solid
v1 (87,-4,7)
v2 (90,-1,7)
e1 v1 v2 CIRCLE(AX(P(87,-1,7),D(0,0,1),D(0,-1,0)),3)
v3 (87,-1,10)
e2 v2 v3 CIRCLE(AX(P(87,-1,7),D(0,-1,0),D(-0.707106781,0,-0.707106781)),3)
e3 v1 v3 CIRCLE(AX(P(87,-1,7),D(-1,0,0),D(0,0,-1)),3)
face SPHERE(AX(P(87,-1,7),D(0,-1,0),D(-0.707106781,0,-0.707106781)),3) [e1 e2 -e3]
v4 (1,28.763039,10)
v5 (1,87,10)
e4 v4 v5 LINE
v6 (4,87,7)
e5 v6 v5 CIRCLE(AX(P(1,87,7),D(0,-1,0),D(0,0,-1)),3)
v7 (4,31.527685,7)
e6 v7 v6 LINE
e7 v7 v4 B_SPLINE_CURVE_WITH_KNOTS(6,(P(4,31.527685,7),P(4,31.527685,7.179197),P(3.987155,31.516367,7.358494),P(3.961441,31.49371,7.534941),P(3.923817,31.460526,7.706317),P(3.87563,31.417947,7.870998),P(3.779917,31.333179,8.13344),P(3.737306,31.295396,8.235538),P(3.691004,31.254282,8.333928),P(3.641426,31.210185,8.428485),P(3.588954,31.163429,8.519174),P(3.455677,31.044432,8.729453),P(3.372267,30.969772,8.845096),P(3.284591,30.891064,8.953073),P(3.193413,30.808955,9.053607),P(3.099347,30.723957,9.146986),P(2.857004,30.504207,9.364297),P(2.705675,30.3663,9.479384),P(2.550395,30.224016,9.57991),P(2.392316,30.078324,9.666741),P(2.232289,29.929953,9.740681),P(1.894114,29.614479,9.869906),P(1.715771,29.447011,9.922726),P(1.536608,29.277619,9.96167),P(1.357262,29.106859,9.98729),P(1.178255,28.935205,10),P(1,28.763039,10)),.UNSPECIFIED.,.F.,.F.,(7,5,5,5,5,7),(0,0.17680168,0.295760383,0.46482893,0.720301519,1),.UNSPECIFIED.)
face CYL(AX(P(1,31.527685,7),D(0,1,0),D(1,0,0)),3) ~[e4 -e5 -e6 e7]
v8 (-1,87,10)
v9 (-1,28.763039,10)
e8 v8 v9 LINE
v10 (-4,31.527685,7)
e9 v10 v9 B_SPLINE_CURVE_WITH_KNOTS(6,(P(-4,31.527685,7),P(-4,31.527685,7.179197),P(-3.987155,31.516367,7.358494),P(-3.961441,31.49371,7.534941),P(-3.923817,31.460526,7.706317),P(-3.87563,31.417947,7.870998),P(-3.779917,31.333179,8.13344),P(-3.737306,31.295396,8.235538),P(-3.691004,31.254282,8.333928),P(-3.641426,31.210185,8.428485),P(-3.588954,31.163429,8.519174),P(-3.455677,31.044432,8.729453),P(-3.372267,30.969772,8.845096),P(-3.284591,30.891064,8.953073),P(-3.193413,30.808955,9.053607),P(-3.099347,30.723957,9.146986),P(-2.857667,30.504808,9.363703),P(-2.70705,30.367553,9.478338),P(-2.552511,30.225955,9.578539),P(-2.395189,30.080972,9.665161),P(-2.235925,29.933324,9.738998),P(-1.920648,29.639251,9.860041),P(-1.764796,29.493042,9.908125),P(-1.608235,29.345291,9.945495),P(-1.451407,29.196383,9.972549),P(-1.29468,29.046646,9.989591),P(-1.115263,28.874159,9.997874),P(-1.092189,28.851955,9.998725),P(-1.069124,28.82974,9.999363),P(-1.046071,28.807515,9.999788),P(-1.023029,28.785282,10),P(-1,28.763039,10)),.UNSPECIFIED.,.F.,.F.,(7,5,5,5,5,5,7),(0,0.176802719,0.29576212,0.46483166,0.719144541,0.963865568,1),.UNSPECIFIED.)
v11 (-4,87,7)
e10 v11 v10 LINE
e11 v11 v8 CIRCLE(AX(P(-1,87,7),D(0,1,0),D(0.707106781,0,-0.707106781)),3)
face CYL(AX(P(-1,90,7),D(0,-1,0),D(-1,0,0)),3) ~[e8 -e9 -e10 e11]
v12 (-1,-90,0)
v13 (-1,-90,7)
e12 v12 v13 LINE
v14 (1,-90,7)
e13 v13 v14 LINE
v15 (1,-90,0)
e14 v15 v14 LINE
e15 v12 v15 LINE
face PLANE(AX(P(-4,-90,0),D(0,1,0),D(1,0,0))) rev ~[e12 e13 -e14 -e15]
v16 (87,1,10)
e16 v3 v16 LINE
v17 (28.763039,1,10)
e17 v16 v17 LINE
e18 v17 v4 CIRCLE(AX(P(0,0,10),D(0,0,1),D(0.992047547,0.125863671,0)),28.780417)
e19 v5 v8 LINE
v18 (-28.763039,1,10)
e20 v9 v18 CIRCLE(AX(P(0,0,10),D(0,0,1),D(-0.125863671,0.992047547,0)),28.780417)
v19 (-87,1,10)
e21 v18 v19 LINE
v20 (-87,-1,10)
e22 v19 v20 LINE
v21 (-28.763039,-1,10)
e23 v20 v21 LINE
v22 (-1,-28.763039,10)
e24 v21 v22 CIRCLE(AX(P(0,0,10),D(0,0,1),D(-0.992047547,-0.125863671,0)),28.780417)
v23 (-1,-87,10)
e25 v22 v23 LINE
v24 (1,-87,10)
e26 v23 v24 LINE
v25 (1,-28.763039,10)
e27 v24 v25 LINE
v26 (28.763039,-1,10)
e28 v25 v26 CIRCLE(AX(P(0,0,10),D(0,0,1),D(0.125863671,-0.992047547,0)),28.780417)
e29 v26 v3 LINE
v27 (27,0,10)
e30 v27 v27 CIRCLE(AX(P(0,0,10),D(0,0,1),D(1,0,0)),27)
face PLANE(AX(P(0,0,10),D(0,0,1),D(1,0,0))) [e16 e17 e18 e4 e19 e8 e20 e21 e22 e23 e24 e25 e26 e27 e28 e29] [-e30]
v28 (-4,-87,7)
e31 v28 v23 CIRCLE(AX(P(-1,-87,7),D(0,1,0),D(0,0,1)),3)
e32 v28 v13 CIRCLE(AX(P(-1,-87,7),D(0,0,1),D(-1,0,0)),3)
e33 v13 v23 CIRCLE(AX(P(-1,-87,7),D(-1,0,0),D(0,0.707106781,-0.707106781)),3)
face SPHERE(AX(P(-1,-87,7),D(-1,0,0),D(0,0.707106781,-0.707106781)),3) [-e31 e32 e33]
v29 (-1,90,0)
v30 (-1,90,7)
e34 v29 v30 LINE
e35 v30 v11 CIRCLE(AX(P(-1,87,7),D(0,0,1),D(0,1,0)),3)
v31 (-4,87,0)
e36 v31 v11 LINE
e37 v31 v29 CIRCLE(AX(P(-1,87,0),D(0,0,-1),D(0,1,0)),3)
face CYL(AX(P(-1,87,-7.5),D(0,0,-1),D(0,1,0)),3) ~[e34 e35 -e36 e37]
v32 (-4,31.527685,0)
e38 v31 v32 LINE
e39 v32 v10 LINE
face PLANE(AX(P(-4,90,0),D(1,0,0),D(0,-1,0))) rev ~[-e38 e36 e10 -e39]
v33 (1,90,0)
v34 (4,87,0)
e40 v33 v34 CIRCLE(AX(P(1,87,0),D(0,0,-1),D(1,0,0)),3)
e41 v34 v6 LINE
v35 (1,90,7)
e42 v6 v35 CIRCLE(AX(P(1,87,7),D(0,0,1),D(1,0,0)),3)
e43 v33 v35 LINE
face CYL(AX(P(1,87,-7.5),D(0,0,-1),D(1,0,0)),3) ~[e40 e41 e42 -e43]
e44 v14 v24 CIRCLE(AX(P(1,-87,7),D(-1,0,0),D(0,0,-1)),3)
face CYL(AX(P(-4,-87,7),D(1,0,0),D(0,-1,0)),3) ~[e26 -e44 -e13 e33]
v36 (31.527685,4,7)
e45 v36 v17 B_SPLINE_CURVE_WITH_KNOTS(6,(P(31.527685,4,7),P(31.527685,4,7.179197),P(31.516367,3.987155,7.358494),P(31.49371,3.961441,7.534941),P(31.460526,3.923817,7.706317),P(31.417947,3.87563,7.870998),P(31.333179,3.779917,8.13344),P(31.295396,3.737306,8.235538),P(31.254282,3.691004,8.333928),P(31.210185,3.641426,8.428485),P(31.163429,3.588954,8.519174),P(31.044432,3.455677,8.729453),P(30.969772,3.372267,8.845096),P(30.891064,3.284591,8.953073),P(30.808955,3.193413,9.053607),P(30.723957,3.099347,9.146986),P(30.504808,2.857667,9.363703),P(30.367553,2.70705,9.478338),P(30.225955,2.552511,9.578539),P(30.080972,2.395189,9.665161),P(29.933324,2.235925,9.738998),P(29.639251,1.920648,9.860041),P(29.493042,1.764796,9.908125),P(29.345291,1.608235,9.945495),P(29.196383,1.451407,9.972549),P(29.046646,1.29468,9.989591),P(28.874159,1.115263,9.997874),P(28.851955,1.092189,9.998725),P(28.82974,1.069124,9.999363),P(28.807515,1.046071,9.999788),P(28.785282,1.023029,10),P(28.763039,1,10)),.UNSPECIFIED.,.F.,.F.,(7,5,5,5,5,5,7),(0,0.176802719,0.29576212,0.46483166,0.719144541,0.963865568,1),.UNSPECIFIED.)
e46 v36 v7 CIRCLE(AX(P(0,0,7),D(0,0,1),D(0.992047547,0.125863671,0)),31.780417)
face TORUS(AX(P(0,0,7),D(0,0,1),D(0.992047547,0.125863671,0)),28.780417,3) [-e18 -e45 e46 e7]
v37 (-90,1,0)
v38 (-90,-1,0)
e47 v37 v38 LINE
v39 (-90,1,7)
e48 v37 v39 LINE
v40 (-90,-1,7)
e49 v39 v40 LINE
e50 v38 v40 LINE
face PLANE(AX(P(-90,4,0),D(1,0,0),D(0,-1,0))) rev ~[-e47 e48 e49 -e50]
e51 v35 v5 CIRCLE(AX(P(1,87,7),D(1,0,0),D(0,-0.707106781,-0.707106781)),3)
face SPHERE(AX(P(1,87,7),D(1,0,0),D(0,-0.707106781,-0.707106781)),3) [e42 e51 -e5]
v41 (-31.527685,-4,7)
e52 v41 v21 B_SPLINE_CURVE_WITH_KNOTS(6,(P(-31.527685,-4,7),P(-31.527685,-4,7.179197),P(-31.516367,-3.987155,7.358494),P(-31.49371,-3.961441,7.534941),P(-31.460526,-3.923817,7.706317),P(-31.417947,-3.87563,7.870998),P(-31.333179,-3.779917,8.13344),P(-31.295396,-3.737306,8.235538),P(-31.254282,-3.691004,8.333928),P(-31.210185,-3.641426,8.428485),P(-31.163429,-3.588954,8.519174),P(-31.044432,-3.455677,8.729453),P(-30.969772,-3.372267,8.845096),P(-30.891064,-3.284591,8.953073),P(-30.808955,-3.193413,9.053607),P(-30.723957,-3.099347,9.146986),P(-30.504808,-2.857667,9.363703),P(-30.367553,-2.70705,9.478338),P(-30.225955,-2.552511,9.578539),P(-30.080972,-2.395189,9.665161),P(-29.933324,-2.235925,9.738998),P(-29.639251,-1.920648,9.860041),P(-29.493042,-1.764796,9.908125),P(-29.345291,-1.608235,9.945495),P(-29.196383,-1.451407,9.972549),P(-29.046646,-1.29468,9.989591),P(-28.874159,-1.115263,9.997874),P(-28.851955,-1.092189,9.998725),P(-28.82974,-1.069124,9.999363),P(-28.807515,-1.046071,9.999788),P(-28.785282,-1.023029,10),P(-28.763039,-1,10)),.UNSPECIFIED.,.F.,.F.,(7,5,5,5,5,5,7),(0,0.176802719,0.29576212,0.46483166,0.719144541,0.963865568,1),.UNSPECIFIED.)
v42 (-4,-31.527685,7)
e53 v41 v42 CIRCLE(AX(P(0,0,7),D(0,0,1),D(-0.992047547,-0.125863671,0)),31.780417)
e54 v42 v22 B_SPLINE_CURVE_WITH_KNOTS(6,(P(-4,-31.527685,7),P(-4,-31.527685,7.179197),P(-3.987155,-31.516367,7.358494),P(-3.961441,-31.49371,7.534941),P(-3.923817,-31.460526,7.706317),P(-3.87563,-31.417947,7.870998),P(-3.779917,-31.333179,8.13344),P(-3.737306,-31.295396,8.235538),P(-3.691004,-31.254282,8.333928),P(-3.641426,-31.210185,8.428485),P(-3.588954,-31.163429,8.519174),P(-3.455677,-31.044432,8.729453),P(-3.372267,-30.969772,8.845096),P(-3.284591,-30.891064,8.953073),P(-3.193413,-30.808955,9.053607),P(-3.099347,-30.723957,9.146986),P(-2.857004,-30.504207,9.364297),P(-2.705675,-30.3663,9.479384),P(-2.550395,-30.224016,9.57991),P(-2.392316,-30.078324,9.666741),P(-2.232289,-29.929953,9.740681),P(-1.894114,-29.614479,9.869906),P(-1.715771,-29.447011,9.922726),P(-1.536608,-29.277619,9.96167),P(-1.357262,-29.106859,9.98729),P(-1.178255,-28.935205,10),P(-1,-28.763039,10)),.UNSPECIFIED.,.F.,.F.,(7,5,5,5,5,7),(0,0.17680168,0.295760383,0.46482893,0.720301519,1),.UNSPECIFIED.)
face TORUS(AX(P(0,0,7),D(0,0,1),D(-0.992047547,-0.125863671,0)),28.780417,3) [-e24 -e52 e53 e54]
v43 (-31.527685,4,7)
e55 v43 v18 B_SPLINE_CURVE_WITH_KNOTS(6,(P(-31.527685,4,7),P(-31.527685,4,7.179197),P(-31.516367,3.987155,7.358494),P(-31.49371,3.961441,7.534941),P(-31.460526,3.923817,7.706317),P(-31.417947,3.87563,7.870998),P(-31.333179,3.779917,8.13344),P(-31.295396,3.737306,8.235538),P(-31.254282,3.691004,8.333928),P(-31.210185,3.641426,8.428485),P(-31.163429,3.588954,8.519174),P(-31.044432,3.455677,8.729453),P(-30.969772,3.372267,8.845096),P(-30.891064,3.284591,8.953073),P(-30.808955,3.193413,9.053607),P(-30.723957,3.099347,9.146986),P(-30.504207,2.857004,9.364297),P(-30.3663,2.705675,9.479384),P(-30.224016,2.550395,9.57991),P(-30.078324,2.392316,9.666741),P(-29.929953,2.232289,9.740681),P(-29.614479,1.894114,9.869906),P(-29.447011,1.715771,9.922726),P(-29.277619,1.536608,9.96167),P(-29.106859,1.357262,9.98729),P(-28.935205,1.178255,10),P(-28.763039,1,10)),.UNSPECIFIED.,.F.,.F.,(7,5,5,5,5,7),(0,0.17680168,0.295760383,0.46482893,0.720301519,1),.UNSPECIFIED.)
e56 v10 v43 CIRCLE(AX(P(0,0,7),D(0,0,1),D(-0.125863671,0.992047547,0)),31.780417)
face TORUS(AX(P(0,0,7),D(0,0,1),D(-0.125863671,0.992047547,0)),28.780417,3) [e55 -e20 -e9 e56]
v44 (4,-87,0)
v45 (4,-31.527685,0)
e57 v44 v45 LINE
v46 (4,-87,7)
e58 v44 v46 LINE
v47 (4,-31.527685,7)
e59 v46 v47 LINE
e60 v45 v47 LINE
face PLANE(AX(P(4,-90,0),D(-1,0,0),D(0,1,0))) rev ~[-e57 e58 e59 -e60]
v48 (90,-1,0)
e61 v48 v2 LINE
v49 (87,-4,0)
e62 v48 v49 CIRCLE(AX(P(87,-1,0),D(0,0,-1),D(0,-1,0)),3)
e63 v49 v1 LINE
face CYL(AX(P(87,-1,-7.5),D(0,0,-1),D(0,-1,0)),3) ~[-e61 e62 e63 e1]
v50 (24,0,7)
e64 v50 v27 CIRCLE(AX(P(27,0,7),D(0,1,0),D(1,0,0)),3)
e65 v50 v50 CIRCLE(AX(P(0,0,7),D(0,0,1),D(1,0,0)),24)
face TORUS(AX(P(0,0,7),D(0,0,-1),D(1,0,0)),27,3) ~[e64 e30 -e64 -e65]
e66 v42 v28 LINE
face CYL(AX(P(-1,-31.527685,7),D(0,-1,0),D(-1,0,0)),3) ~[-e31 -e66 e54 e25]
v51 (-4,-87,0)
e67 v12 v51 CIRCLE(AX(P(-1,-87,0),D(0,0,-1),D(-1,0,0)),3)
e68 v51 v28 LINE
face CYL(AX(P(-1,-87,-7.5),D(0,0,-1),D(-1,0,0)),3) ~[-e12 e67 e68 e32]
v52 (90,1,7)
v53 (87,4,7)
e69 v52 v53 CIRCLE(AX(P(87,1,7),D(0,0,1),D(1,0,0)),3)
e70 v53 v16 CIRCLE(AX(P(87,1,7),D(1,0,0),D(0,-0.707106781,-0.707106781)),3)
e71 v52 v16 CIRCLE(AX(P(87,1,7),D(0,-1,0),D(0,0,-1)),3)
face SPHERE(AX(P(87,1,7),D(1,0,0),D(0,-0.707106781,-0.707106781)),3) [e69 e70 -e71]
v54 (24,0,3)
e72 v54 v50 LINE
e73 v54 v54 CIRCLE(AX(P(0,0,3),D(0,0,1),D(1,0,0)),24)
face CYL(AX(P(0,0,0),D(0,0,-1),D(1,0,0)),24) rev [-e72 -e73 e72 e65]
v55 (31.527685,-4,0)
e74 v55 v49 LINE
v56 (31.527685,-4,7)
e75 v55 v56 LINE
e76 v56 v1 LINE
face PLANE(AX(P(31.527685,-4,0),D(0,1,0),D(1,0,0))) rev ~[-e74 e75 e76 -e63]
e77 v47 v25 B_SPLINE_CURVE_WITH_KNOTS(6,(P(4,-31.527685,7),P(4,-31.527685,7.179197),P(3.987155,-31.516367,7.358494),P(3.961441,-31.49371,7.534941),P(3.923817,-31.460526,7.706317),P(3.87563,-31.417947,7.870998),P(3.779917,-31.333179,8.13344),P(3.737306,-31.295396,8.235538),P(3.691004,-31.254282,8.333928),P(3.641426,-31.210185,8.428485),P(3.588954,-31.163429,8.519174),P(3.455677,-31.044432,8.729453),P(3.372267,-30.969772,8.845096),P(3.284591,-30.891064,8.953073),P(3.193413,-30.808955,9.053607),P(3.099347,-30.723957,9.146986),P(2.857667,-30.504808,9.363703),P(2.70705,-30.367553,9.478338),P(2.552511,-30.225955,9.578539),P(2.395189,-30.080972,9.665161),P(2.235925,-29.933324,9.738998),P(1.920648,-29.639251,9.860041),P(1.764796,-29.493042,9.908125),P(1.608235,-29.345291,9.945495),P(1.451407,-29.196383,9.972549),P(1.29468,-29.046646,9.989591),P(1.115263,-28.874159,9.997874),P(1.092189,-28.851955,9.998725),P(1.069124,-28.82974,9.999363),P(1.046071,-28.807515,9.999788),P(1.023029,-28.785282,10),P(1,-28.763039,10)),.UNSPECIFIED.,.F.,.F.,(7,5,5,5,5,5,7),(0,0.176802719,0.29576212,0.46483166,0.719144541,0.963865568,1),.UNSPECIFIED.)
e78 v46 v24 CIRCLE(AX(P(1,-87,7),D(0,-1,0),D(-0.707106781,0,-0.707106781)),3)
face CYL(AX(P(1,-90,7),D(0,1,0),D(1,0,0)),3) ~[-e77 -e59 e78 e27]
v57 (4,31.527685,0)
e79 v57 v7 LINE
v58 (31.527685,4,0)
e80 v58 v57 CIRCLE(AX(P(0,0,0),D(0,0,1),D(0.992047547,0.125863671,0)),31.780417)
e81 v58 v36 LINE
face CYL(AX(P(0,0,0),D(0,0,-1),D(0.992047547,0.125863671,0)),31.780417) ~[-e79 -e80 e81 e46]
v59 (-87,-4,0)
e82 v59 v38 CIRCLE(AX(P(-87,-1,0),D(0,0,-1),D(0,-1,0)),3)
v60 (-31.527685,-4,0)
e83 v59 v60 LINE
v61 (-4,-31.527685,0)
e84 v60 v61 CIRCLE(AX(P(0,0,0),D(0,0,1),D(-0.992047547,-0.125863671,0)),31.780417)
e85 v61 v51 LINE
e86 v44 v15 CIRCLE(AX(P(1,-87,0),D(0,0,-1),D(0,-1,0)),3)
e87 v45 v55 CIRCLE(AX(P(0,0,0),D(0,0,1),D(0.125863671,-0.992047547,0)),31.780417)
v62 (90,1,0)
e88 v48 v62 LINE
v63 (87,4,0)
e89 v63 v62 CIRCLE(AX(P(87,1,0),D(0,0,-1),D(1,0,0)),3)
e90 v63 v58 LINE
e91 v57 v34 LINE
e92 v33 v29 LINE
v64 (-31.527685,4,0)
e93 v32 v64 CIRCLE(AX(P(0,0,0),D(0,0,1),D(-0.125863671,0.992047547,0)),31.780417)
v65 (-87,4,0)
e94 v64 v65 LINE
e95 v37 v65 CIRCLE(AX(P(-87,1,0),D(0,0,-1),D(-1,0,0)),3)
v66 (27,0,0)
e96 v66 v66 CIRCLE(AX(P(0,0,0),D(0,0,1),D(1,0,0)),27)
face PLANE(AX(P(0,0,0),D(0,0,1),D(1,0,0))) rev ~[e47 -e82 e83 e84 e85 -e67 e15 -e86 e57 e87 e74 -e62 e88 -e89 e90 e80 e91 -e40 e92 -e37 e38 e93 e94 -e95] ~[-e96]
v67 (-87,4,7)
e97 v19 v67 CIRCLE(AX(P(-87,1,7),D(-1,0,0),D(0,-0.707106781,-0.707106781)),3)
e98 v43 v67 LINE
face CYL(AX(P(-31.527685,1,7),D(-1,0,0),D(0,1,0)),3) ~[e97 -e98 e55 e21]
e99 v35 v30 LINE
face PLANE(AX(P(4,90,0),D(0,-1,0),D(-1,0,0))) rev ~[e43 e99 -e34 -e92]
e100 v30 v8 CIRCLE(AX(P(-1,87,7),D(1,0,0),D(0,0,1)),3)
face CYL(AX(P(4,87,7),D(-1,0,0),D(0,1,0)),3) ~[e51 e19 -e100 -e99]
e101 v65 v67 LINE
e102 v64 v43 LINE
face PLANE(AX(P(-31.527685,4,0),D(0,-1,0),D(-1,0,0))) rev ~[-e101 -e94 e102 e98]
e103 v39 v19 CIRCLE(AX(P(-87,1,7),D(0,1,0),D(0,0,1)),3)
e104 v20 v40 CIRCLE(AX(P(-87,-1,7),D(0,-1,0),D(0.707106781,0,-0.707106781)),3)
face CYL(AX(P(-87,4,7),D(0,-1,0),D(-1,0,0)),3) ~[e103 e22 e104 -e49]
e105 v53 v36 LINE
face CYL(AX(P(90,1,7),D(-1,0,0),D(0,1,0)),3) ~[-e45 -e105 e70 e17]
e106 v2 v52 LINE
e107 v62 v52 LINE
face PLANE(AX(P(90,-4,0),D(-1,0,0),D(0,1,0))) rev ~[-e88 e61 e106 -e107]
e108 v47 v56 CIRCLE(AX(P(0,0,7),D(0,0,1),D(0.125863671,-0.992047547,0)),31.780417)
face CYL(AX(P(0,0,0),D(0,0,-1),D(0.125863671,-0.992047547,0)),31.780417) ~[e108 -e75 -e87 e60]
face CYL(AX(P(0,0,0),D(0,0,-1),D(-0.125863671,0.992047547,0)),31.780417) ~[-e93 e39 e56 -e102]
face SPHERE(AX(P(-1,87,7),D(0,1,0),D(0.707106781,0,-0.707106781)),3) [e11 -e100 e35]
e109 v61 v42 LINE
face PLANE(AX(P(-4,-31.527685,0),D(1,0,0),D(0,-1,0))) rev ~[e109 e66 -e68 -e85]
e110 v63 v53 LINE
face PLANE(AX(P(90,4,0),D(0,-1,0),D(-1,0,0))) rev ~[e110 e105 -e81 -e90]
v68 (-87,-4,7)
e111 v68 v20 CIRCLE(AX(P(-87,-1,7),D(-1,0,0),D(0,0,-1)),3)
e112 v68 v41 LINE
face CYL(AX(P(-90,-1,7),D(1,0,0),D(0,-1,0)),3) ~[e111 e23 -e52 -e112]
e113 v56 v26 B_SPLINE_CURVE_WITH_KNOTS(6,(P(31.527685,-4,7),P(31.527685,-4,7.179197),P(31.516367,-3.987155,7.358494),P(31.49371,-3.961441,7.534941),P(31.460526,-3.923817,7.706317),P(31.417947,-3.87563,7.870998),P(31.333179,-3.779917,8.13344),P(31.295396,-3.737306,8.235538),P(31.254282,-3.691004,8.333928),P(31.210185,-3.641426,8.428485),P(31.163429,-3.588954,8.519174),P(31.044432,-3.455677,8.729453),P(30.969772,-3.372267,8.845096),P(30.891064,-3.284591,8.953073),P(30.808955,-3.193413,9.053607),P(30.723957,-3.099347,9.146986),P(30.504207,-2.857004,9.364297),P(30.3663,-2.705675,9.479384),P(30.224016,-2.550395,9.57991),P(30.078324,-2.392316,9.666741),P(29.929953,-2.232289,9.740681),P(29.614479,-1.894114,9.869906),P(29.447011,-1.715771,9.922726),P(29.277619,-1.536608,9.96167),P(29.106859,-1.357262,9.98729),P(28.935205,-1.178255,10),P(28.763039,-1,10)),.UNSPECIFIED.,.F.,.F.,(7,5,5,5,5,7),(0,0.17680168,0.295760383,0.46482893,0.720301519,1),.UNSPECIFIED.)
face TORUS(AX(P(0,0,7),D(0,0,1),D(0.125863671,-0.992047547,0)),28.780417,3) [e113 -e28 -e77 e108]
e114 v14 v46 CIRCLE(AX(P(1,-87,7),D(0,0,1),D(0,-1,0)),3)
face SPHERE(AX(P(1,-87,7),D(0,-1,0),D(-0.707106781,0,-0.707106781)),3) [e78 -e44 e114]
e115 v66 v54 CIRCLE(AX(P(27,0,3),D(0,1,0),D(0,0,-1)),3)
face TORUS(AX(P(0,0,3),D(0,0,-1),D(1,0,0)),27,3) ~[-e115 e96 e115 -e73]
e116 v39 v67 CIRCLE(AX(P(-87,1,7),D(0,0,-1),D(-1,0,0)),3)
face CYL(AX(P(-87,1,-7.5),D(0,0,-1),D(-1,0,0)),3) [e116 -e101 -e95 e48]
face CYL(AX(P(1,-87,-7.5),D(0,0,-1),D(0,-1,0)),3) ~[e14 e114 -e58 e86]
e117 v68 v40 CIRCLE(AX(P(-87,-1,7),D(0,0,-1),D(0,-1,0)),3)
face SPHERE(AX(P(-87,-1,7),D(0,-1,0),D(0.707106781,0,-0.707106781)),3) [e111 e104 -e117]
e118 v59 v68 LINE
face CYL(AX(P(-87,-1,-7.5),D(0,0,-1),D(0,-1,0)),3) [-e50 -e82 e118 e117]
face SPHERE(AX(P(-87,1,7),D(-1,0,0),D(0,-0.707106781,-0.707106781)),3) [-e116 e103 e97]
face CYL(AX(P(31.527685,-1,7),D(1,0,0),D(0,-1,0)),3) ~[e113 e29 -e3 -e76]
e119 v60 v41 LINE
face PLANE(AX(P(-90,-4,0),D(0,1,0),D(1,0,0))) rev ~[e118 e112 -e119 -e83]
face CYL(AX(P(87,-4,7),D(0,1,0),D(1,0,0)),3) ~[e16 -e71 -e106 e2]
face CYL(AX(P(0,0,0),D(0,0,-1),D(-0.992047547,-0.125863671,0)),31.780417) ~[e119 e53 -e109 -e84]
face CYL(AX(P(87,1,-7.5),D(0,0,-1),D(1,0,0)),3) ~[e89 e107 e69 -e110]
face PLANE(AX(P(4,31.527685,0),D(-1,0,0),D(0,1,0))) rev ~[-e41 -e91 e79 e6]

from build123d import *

# Parameters (mm, degrees)
F0_R         = 24
F1_DEPTH     = 10
F2_R         = 3
F3_T1_DEPTH  = 14.5
F3_S5_W      = 3
F3_S5_H      = 3
F3_T6_DEPTH  = 3
F3_S11_W     = 3
F3_S11_H     = 3
F3_T12_DEPTH = 3
F3_S17_W     = 3
F3_S17_H     = 3
F3_T18_DEPTH = 3
F3_S23_W     = 3
F3_S23_H     = 3
F3_T24_DEPTH = 3
F3_S29_W     = 3
F3_S29_H     = 3
F3_T30_DEPTH = 3
F3_S35_W     = 3
F3_S35_H     = 3
F3_T36_DEPTH = 3
F3_S41_W     = 3
F3_S41_H     = 3
F3_T42_DEPTH = 3
F3_S47_W     = 3
F3_S47_H     = 3
F3_T48_DEPTH = 3


# Not quite as in the source:
# - a fillet or chamfer that OpenCascade refuses, or shapes differently, is made with other operations: its cross-section is extruded or revolved along the edge and cut away or added


with BuildPart() as f1:
    # F0 (on Top) → F1 (new body)
    with BuildSketch(Plane.XY):
        with BuildLine():
            Line((31.5276851761, -4), (90, -4))
            Line((90, -4), (90, 4))
            Line((90, 4), (31.5276851761, 4))
            ThreePointArc((31.5276851761, 4), (22.4721486797, 22.4721486797), (4, 31.5276851761))
            Line((4, 31.5276851761), (4, 90))
            Line((4, 90), (-4, 90))
            Line((-4, 90), (-4, 31.5276851761))
            ThreePointArc((-4, 31.5276851761), (-22.4721486797, 22.4721486797), (-31.5276851761, 4))
            Line((-31.5276851761, 4), (-90, 4))
            Line((-90, 4), (-90, -4))
            Line((-90, -4), (-31.5276851761, -4))
            ThreePointArc((-31.5276851761, -4), (-22.4721486797, -22.4721486797), (-4, -31.5276851761))
            Line((-4, -31.5276851761), (-4, -90))
            Line((-4, -90), (4, -90))
            Line((4, -90), (4, -31.5276851761))
            ThreePointArc((4, -31.5276851761), (22.4721486797, -22.4721486797), (31.5276851761, -4))
        make_face()
        Circle(F0_R, mode=Mode.SUBTRACT)
    extrude(amount=F1_DEPTH)

    # F2
    f2_edges = [f1.edges().sort_by_distance(p)[0] for p in [
        (-22.472149, -22.472149, 10),
        (-4, -60.763843, 10),
        (0, -90, 10),
        (4, -60.763843, 10),
        (22.472149, -22.472149, 10),
        (60.763843, -4, 10),
        (90, 0, 10),
        (60.763843, 4, 10),
        (22.472149, 22.472149, 10),
        (4, 60.763843, 10),
        (0, 90, 10),
        (-4, 60.763843, 10),
        (-22.472149, 22.472149, 10),
        (-60.763843, 4, 10),
        (-90, 0, 10),
        (-60.763843, -4, 10),
        (-24, 0, 10),
    ]]
    fillet(f2_edges, radius=F2_R)

    # F3: fillet of radius 3 on 9 edges, made by hand

    # F3_s2 → F3_t1 (cut)
    with BuildSketch(Plane.XY.offset(-7.5)):
        with BuildLine():
            ThreePointArc((-87, -4), (-89.1213203436, -3.1213203436), (-90, -1))
            Line((-90, -1), (-90, -4))
            Line((-90, -4), (-87, -4))
        make_face()
        with BuildLine():
            ThreePointArc((-90, 1), (-89.1213203436, 3.1213203436), (-87, 4))
            Line((-87, 4), (-90, 4))
            Line((-90, 4), (-90, 1))
        make_face()
        with BuildLine():
            ThreePointArc((1, -90), (3.1213203436, -89.1213203436), (4, -87))
            Line((4, -87), (4, -90))
            Line((4, -90), (1, -90))
        make_face()
        with BuildLine():
            ThreePointArc((-4, -87), (-3.1213203436, -89.1213203436), (-1, -90))
            Line((-1, -90), (-4, -90))
            Line((-4, -90), (-4, -87))
        make_face()
        with BuildLine():
            ThreePointArc((87, -4), (89.1213203436, -3.1213203436), (90, -1))
            Line((90, -1), (90, -4))
            Line((90, -4), (87, -4))
        make_face()
        with BuildLine():
            ThreePointArc((90, 1), (89.1213203436, 3.1213203436), (87, 4))
            Line((87, 4), (90, 4))
            Line((90, 4), (90, 1))
        make_face()
        with BuildLine():
            ThreePointArc((4, 87), (3.1213203436, 89.1213203436), (1, 90))
            Line((1, 90), (4, 90))
            Line((4, 90), (4, 87))
        make_face()
        with BuildLine():
            ThreePointArc((-1, 90), (-3.1213203436, 89.1213203436), (-4, 87))
            Line((-4, 87), (-4, 90))
            Line((-4, 90), (-1, 90))
        make_face()
    extrude(amount=F3_T1_DEPTH, mode=Mode.SUBTRACT)


with BuildPart() as f3_tool4:
    # F3_s5 → F3_t6 (new body)
    with BuildSketch(Plane.XZ.offset(-87)):
        with Locations((-2.5, 8.5)):
            Rectangle(F3_S5_W, F3_S5_H)
    extrude(amount=-F3_T6_DEPTH)

    # F3_s7 → F3_t8 (revolve, cut)
    with BuildSketch(Plane(origin=(-1, 87, 7), x_dir=(0.7071067812, 0, -0.7071067812), z_dir=(0.7071067812, 0, 0.7071067812))):
        with BuildLine():
            ThreePointArc((0, -3), (3, 0), (0, 3))
            Line((0, 3), (0, -3))
        make_face()
    revolve(axis=Axis((-1, 87, 7), (0, 1, 0)), mode=Mode.SUBTRACT)


with BuildPart() as f1_1:
    add(f1.part)

    # F3_t3: cut F3_tool4
    add(f3_tool4.part, mode=Mode.SUBTRACT)


with BuildPart() as f3_tool10:
    # F3_s11 → F3_t12 (new body)
    with BuildSketch(Plane.YZ.offset(1)):
        with Locations((88.5, 8.5)):
            Rectangle(F3_S11_W, F3_S11_H)
    extrude(amount=F3_T12_DEPTH)

    # F3_s13 → F3_t14 (revolve, cut)
    with BuildSketch(Plane(origin=(1, 87, 7), x_dir=(0, -0.7071067812, -0.7071067812), z_dir=(0, -0.7071067812, 0.7071067812))):
        with BuildLine():
            ThreePointArc((0, -3), (3, 0), (0, 3))
            Line((0, 3), (0, -3))
        make_face()
    revolve(axis=Axis((1, 87, 7), (1, 0, 0)), mode=Mode.SUBTRACT)


with BuildPart() as f1_2:
    add(f1_1.part)

    # F3_t9: cut F3_tool10
    add(f3_tool10.part, mode=Mode.SUBTRACT)


with BuildPart() as f3_tool16:
    # F3_s17 → F3_t18 (new body)
    with BuildSketch(Plane.YZ.offset(87)):
        with Locations((2.5, 8.5)):
            Rectangle(F3_S17_W, F3_S17_H)
    extrude(amount=F3_T18_DEPTH)

    # F3_s19 → F3_t20 (revolve, cut)
    with BuildSketch(Plane(origin=(87, 1, 7), x_dir=(0, -0.7071067812, -0.7071067812), z_dir=(0, -0.7071067812, 0.7071067812))):
        with BuildLine():
            ThreePointArc((0, -3), (3, 0), (0, 3))
            Line((0, 3), (0, -3))
        make_face()
    revolve(axis=Axis((87, 1, 7), (1, 0, 0)), mode=Mode.SUBTRACT)


with BuildPart() as f1_3:
    add(f1_2.part)

    # F3_t15: cut F3_tool16
    add(f3_tool16.part, mode=Mode.SUBTRACT)


with BuildPart() as f3_tool22:
    # F3_s23 → F3_t24 (new body)
    with BuildSketch(Plane.XZ.offset(1)):
        with Locations((88.5, 8.5)):
            Rectangle(F3_S23_W, F3_S23_H)
    extrude(amount=F3_T24_DEPTH)

    # F3_s25 → F3_t26 (revolve, cut)
    with BuildSketch(Plane(origin=(87, -1, 7), x_dir=(-0.7071067812, 0, -0.7071067812), z_dir=(-0.7071067812, 0, 0.7071067812))):
        with BuildLine():
            ThreePointArc((0, -3), (3, 0), (0, 3))
            Line((0, 3), (0, -3))
        make_face()
    revolve(axis=Axis((87, -1, 7), (0, -1, 0)), mode=Mode.SUBTRACT)


with BuildPart() as f1_4:
    add(f1_3.part)

    # F3_t21: cut F3_tool22
    add(f3_tool22.part, mode=Mode.SUBTRACT)


with BuildPart() as f3_tool28:
    # F3_s29 → F3_t30 (new body)
    with BuildSketch(Plane.YZ.offset(-1)):
        with Locations((-88.5, 8.5)):
            Rectangle(F3_S29_W, F3_S29_H)
    extrude(amount=-F3_T30_DEPTH)

    # F3_s31 → F3_t32 (revolve, cut)
    with BuildSketch(Plane(origin=(-1, -87, 7), x_dir=(0, 0.7071067812, -0.7071067812), z_dir=(0, 0.7071067812, 0.7071067812))):
        with BuildLine():
            ThreePointArc((0, -3), (3, 0), (0, 3))
            Line((0, 3), (0, -3))
        make_face()
    revolve(axis=Axis((-1, -87, 7), (-1, 0, 0)), mode=Mode.SUBTRACT)


with BuildPart() as f1_5:
    add(f1_4.part)

    # F3_t27: cut F3_tool28
    add(f3_tool28.part, mode=Mode.SUBTRACT)


with BuildPart() as f3_tool34:
    # F3_s35 → F3_t36 (new body)
    with BuildSketch(Plane.XZ.offset(87)):
        with Locations((2.5, 8.5)):
            Rectangle(F3_S35_W, F3_S35_H)
    extrude(amount=F3_T36_DEPTH)

    # F3_s37 → F3_t38 (revolve, cut)
    with BuildSketch(Plane(origin=(1, -87, 7), x_dir=(-0.7071067812, 0, -0.7071067812), z_dir=(-0.7071067812, 0, 0.7071067812))):
        with BuildLine():
            ThreePointArc((0, -3), (3, 0), (0, 3))
            Line((0, 3), (0, -3))
        make_face()
    revolve(axis=Axis((1, -87, 7), (0, -1, 0)), mode=Mode.SUBTRACT)


with BuildPart() as f1_6:
    add(f1_5.part)

    # F3_t33: cut F3_tool34
    add(f3_tool34.part, mode=Mode.SUBTRACT)


with BuildPart() as f3_tool40:
    # F3_s41 → F3_t42 (new body)
    with BuildSketch(Plane.YZ.offset(-87)):
        with Locations((2.5, 8.5)):
            Rectangle(F3_S41_W, F3_S41_H)
    extrude(amount=-F3_T42_DEPTH)

    # F3_s43 → F3_t44 (revolve, cut)
    with BuildSketch(Plane(origin=(-87, 1, 7), x_dir=(0, -0.7071067812, -0.7071067812), z_dir=(0, 0.7071067812, -0.7071067812))):
        with BuildLine():
            ThreePointArc((0, -3), (3, 0), (0, 3))
            Line((0, 3), (0, -3))
        make_face()
    revolve(axis=Axis((-87, 1, 7), (-1, 0, 0)), mode=Mode.SUBTRACT)


with BuildPart() as f1_7:
    add(f1_6.part)

    # F3_t39: cut F3_tool40
    add(f3_tool40.part, mode=Mode.SUBTRACT)


with BuildPart() as f3_tool46:
    # F3_s47 → F3_t48 (new body)
    with BuildSketch(Plane.XZ.offset(1)):
        with Locations((-88.5, 8.5)):
            Rectangle(F3_S47_W, F3_S47_H)
    extrude(amount=F3_T48_DEPTH)

    # F3_s49 → F3_t50 (revolve, cut)
    with BuildSketch(Plane(origin=(-87, -1, 7), x_dir=(0.7071067812, 0, -0.7071067812), z_dir=(-0.7071067812, 0, -0.7071067812))):
        with BuildLine():
            ThreePointArc((0, -3), (3, 0), (0, 3))
            Line((0, 3), (0, -3))
        make_face()
    revolve(axis=Axis((-87, -1, 7), (0, -1, 0)), mode=Mode.SUBTRACT)


with BuildPart() as f1_8:
    add(f1_7.part)

    # F3_t45: cut F3_tool46
    add(f3_tool46.part, mode=Mode.SUBTRACT)

    # F3_s51 → F3_t52 (revolve, cut)
    with BuildSketch(Plane.XZ):
        with BuildLine():
            ThreePointArc((27, 0), (24.8786796564, 0.8786796564), (24, 3))
            Line((24, 3), (24, 0))
            Line((24, 0), (27, 0))
        make_face()
    revolve(axis=Axis((0, 0, 0), (0, 0, 1)), mode=Mode.SUBTRACT)


solid = f1_8.part
